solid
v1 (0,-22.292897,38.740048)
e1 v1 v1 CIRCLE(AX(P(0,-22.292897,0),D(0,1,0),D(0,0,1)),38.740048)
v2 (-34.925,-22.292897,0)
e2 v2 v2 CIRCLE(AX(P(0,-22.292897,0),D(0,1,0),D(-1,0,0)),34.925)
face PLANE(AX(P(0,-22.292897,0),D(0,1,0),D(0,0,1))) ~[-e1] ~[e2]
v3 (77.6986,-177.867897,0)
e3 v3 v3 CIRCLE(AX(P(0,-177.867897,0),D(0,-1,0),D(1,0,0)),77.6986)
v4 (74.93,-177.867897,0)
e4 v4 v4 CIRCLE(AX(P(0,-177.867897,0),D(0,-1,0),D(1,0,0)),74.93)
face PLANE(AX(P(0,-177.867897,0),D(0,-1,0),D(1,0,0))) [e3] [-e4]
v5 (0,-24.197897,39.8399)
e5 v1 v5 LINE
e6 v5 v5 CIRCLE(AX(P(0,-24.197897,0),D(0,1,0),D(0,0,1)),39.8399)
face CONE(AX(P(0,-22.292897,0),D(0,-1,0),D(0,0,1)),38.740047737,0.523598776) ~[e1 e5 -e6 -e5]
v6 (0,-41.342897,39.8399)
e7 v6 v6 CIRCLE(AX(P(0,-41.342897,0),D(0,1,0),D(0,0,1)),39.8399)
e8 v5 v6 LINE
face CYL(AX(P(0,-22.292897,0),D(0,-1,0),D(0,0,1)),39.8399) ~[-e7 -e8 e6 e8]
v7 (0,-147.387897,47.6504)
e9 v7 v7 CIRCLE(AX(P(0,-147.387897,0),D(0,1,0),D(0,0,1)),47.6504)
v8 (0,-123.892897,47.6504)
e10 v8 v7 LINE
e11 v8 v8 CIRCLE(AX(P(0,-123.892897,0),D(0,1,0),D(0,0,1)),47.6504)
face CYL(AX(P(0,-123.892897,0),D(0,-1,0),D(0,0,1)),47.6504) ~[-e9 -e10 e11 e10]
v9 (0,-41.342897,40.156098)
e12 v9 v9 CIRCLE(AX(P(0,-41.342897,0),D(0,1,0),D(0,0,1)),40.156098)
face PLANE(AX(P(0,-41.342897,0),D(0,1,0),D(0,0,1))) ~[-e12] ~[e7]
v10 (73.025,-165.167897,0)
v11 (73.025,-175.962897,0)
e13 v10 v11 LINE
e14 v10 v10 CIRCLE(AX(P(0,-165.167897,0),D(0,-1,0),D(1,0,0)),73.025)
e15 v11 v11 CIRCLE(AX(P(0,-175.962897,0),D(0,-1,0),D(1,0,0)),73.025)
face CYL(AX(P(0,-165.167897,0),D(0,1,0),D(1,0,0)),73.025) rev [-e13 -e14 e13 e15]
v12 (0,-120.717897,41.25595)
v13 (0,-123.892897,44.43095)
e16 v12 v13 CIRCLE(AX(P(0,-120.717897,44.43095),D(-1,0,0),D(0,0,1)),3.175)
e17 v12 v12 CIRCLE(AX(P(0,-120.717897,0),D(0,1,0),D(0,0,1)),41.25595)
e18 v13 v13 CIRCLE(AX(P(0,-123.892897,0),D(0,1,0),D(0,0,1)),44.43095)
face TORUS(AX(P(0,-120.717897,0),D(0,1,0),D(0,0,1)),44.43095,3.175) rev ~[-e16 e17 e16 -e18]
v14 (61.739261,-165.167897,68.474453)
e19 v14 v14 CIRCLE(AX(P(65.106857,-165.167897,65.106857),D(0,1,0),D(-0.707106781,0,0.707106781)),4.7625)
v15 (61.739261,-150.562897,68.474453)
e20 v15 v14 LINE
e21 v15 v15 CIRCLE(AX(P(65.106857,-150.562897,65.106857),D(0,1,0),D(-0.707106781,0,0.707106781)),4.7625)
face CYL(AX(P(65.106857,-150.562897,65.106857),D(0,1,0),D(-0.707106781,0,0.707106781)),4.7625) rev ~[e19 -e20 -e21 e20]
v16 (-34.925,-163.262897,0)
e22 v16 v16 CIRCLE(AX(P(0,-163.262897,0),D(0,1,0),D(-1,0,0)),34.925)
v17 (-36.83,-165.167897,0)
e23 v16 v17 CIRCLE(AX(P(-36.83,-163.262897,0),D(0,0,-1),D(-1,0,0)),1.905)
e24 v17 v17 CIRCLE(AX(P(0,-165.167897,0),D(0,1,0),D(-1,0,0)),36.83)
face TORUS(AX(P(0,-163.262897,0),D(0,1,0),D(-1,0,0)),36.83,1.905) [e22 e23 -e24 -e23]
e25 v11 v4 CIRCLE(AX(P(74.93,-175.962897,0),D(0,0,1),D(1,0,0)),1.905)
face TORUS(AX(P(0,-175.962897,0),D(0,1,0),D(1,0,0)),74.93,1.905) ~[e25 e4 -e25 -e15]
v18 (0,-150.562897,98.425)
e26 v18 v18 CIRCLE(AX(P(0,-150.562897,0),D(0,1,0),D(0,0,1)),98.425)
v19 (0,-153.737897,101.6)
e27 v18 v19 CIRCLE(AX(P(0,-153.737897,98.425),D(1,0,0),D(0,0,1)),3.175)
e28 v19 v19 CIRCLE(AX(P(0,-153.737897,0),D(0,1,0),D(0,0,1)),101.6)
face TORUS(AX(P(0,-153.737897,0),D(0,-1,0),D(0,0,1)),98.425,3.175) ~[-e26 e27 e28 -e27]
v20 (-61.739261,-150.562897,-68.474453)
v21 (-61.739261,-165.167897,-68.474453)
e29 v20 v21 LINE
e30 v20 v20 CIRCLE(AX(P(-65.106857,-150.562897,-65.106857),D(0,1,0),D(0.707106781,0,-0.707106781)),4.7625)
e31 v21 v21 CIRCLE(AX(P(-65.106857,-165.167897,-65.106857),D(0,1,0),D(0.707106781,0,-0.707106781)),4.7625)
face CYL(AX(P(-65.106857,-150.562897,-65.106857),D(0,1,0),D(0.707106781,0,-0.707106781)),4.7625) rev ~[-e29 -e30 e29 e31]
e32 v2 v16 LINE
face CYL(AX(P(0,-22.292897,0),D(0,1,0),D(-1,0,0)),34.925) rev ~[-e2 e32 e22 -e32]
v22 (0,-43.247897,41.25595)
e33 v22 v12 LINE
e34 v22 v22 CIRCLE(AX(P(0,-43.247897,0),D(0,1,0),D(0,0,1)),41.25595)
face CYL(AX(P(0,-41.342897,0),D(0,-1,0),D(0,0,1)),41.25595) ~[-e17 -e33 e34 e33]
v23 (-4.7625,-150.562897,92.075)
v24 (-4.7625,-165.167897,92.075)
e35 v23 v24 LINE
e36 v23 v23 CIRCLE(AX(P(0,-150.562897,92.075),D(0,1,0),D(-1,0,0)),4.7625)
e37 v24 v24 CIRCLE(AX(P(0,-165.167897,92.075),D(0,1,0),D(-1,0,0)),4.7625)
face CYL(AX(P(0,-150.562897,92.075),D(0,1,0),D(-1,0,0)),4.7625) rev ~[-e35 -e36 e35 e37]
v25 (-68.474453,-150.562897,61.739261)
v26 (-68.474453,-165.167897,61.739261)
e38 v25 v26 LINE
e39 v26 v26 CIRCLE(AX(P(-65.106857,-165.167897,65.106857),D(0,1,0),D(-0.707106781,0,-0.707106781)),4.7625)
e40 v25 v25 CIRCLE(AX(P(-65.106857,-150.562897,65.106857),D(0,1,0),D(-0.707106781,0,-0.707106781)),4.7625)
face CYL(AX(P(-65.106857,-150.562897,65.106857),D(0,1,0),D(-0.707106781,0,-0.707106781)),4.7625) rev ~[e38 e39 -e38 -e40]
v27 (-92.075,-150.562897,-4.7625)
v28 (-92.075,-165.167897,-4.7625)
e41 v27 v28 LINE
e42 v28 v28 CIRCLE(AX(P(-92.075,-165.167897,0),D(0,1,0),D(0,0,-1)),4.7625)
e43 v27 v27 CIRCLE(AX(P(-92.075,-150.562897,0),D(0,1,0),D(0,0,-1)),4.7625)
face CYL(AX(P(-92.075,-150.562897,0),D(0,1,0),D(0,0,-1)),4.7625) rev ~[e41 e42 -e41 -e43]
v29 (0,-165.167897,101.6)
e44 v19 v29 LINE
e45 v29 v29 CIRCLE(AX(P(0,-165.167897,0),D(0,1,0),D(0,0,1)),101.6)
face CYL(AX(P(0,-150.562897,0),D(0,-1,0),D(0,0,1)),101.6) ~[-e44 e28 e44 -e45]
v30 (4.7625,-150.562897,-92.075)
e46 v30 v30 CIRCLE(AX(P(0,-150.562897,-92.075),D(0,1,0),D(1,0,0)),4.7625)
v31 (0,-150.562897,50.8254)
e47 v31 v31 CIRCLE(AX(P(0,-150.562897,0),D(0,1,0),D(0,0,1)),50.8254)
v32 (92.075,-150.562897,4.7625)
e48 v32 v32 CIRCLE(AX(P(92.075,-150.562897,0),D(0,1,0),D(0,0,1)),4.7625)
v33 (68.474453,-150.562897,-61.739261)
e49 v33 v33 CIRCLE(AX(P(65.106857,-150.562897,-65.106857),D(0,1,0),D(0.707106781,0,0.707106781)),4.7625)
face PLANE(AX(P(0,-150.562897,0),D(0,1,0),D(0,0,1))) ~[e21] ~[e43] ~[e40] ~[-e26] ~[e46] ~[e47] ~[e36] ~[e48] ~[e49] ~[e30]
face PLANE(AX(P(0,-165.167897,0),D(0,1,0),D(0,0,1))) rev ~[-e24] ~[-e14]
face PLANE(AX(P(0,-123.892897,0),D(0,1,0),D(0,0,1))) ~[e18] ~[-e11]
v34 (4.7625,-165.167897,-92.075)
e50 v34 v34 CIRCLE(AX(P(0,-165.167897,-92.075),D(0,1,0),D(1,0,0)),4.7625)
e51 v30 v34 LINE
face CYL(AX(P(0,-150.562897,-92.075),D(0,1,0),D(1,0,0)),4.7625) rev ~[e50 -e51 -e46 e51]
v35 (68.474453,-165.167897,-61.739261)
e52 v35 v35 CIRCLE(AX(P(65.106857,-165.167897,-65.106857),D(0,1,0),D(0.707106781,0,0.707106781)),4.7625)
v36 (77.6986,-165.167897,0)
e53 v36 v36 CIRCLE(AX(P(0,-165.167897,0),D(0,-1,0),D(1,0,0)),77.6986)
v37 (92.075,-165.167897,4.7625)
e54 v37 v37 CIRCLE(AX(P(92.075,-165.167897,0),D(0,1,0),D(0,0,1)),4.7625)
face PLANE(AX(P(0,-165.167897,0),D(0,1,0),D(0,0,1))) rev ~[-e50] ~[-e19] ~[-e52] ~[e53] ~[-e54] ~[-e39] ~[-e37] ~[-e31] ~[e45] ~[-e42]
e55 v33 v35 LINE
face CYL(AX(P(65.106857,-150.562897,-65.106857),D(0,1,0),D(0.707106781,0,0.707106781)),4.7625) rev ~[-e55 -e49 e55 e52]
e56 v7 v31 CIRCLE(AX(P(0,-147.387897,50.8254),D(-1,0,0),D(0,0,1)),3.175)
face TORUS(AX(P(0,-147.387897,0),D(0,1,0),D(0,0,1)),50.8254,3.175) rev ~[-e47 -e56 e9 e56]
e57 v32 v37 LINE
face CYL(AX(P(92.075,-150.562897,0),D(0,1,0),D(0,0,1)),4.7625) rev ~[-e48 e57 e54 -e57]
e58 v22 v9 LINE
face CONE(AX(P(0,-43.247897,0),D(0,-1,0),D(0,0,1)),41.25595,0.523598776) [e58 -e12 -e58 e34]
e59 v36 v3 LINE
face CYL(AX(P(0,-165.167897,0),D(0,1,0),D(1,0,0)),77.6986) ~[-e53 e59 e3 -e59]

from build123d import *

# Parameters (mm, degrees)
F2_R            = 4.7625
F3_DEPTH        = 25.4
F3_COPIES_COUNT = 8
F4_R            = 34.925
F5_DEPTH        = 152.4
F7_SIZE2        = 1.0998522628
F7_SIZE         = 1.905
F8_R            = 3.175
F9_R            = 77.6986
F9_R_2          = 73.025
F10_DEPTH       = 12.7
F11_R           = 1.905


# Not quite as in the source:
# - a fillet or chamfer that OpenCascade refuses, or shapes differently, is made with other operations: its cross-section is extruded or revolved along the edge and cut away or added
# - a pattern or mirror of a feature is missing from the dataset's text; its kind, count and spacing are read off the source's solid


with BuildPart() as f1:
    # F0 (on Right) → F1 (revolve)
    with BuildSketch(Plane.YZ):
        Polygon((-150.5628967822, 101.6), (-165.1678967822, 101.6), (-165.1678967822, 0), (-22.2928967822, 0), (-22.2928967822, 39.8399), (-41.3428967822, 39.8399), (-41.3428967822, 41.25595), (-123.8928967822, 41.25595), (-123.8928967822, 47.6504), (-150.5628967822, 47.6504), align=None)
    revolve(axis=Axis((0, -0.5433106927, 0), (0, 1, 0)))

    # F2 (on face) → F3 (cut)
    with BuildSketch(Plane(origin=(0, -150.5628967822, 0), x_dir=(-1, 0, 0), z_dir=(0, 1, 0))):
        with Locations((0, 92.075)):
            Circle(F2_R)
    f3 = extrude(amount=-F3_DEPTH, mode=Mode.SUBTRACT)

    # F3_copies: F3 ×8 about axis
    f3_copies_axis = Axis((0, 0, 0), (0, 1, 0))
    for i in range(1, F3_COPIES_COUNT):
        add(f3.rotate(f3_copies_axis, i * 360 / F3_COPIES_COUNT), mode=Mode.SUBTRACT)

    # F4 (on face) → F5 (cut)
    with BuildSketch(Plane(origin=(0, -22.2928967822, 0), x_dir=(-1, 0, 0), z_dir=(0, 1, 0))):
        Circle(F4_R)
    extrude(amount=-F5_DEPTH, mode=Mode.SUBTRACT)

    # F6: chamfer of 1.905 x 1.0998522628 on 1 edges, made by hand

    # F6_s1 → F6_t2 (revolve, cut)
    with BuildSketch(Plane.YZ):
        Polygon((-22.2928967822, 38.7400477372), (-24.1978967822, 39.8399), (-22.2928967822, 39.8399), align=None)
    revolve(axis=Axis((0, -22.2928967822, 0), (0, 1, 0)), mode=Mode.SUBTRACT)

    # F7
    f7_edges = [f1.edges().sort_by_distance(p)[0] for p in [
        (0, -41.342897, -41.25595),
    ]]
    chamfer(f7_edges, length=F7_SIZE, length2=F7_SIZE2)

    # F8
    f8_edges = [f1.edges().sort_by_distance(p)[0] for p in [
        (0, -123.892897, -41.25595),
        (0, -150.562897, -47.6504),
        (0, -150.562897, -101.6),
    ]]
    fillet(f8_edges, radius=F8_R)

    # F9 (on face) → F10 (join)
    with BuildSketch(Plane.XZ.offset(165.1678967822)):
        Circle(F9_R)
        Circle(F9_R_2, mode=Mode.SUBTRACT)
    extrude(amount=F10_DEPTH)

    # F11
    f11_edges = [f1.edges().sort_by_distance(p)[0] for p in [
        (-73.025, -177.867897, 0),
        (34.925, -165.167897, 0),
    ]]
    fillet(f11_edges, radius=F11_R)


solid = f1.part
